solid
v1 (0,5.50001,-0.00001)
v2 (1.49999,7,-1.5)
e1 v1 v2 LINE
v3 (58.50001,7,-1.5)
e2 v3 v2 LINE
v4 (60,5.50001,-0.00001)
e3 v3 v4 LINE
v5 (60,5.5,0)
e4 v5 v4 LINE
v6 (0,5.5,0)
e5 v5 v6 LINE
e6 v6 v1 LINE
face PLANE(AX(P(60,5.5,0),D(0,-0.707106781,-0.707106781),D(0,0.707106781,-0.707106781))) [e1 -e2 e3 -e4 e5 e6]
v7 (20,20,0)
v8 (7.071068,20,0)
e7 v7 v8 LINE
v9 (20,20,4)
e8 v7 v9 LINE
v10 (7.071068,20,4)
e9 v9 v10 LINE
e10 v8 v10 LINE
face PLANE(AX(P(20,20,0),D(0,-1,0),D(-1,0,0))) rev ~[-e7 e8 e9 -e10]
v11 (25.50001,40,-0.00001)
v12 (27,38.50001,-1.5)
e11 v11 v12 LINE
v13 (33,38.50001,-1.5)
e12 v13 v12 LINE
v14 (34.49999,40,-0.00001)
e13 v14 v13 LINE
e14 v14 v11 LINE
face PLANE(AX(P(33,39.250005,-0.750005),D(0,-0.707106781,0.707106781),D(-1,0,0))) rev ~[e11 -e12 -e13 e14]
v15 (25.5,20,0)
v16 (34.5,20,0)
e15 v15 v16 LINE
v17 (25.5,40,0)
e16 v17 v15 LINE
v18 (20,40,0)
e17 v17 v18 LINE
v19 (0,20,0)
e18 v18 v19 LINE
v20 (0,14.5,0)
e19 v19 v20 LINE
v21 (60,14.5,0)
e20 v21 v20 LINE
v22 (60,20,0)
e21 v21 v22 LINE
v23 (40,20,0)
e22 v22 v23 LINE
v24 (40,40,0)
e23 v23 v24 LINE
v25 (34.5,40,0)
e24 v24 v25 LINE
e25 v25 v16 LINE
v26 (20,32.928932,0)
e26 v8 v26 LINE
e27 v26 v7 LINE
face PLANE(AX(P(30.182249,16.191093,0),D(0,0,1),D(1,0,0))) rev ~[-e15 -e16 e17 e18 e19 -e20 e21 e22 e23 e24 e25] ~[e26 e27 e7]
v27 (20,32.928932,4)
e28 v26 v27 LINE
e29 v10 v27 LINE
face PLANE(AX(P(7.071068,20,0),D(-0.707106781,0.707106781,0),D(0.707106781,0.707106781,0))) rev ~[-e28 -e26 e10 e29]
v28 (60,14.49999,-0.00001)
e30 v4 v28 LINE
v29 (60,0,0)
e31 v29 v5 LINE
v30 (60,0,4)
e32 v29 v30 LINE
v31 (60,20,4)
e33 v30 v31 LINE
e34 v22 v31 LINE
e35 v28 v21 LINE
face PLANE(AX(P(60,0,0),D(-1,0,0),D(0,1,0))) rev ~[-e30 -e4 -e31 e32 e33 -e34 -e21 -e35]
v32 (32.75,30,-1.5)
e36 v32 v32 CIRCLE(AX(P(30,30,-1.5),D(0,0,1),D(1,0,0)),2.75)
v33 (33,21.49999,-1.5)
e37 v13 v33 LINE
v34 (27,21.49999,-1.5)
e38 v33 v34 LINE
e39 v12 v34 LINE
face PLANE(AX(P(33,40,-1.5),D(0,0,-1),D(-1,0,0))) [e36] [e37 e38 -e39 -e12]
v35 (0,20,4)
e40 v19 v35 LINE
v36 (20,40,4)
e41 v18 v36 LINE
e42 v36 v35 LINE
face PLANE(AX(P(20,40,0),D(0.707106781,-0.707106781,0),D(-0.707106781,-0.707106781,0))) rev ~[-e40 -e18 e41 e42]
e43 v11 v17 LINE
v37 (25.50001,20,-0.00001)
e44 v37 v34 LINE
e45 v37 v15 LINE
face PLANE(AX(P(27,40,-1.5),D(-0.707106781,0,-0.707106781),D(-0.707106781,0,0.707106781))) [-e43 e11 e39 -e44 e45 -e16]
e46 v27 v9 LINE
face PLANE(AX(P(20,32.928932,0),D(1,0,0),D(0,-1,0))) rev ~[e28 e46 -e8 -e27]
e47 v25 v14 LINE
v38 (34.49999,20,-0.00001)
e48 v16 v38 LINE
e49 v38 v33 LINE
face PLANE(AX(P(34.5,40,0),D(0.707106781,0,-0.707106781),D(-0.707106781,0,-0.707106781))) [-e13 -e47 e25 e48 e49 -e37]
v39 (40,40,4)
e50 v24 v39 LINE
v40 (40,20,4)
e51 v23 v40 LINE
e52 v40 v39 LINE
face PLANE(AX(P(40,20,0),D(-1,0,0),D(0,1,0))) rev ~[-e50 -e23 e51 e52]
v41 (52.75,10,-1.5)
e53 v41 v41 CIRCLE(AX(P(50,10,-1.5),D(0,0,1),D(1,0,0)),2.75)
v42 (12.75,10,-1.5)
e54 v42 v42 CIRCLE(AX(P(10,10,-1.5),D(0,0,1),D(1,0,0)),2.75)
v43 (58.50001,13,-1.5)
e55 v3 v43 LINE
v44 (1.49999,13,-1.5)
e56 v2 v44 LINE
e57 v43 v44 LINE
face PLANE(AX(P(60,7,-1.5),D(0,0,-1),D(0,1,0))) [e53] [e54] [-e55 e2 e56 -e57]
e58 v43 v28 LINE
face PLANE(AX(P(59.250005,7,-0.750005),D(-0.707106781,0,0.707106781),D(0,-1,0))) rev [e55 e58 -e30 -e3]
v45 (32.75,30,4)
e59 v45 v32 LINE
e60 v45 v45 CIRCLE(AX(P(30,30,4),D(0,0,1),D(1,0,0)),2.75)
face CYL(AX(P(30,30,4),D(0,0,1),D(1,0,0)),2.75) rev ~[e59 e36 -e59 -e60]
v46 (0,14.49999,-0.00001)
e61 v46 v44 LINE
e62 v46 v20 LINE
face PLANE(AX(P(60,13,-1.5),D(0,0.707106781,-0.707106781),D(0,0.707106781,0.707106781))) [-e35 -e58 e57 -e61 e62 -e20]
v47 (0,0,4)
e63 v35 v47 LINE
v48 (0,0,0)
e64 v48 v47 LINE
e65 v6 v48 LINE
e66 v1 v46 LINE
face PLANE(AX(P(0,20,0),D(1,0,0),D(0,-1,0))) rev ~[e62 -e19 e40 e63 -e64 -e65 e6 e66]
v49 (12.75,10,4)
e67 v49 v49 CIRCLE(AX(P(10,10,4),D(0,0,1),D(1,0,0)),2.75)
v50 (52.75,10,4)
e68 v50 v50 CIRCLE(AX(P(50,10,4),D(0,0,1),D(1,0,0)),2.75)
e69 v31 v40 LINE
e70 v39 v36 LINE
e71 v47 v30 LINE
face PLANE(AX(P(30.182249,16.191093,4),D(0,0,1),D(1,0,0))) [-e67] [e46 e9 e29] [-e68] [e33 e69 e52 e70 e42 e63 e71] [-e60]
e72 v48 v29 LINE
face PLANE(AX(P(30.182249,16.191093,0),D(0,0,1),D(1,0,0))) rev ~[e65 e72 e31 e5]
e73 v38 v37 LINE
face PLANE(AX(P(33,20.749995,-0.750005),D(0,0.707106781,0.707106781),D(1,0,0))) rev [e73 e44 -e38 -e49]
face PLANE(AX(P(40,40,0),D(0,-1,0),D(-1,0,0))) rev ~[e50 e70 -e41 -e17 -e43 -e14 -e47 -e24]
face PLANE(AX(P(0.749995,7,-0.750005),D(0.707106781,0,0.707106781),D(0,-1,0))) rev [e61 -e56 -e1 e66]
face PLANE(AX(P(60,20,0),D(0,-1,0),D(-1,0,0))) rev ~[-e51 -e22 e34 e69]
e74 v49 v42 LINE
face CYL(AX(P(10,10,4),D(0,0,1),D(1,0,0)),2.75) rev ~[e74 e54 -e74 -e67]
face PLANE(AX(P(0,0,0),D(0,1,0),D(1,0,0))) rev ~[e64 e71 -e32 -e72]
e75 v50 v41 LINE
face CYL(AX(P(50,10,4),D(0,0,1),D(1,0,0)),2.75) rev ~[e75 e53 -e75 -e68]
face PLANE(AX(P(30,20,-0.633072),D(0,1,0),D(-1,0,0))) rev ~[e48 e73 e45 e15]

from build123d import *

# Parameters (mm, degrees)
F1_DEPTH = 4
F3_DEPTH = 60
F5_DEPTH = 20
F6_SIZE  = 1.49999
F7_R     = 2.75
F8_DEPTH = 5.501


# Not quite as in the source:
# - a fillet or chamfer is up to 0.001 mm smaller than in the source, because OpenCascade refuses the exact size


with BuildPart() as f1:
    # F0 (on Top) → F1 (new body)
    with BuildSketch(Plane.XY):
        Polygon((0, 20), (0, 0), (60, 0), (60, 20), (40, 20), (40, 40), (20, 40), align=None)
        Polygon((20, 32.9289321881), (20, 20), (7.0710678119, 20), align=None, mode=Mode.SUBTRACT)
    extrude(amount=F1_DEPTH)

    # F2 (on face) → F3 (join, through all)
    with BuildSketch(Plane.YZ.offset(60)):
        Polygon((14.5, 0), (5.5, 0), (7, -1.5), (13, -1.5), align=None)
    extrude(amount=-F3_DEPTH)

    # F4 (on face) → F5 (join, through all)
    with BuildSketch(Plane(origin=(0, 40, 0), x_dir=(-1, 0, 0), z_dir=(0, 1, 0))):
        Polygon((-25.5, 0), (-34.5, 0), (-33, -1.5), (-27, -1.5), align=None)
    extrude(amount=-F5_DEPTH)

    # F6 (size 1.5 in the source; OpenCascade refuses exactly that, so slightly less here)
    f6_edges = [f1.edges().sort_by_distance(p)[0] for p in [
        (60, 10, -1.5),
        (0, 10, -1.5),
        (30, 20, -1.5),
        (30, 40, -1.5),
    ]]
    chamfer(f6_edges, length=F6_SIZE)

    # F7 (on face) → F8 (cut, through all)
    with BuildSketch(Plane.XY.offset(4)):
        with Locations((30, 30)):
            Circle(F7_R)
        with Locations((10, 10)):
            Circle(F7_R)
        with Locations((50, 10)):
            Circle(F7_R)
    extrude(amount=-F8_DEPTH, mode=Mode.SUBTRACT)


solid = f1.part
